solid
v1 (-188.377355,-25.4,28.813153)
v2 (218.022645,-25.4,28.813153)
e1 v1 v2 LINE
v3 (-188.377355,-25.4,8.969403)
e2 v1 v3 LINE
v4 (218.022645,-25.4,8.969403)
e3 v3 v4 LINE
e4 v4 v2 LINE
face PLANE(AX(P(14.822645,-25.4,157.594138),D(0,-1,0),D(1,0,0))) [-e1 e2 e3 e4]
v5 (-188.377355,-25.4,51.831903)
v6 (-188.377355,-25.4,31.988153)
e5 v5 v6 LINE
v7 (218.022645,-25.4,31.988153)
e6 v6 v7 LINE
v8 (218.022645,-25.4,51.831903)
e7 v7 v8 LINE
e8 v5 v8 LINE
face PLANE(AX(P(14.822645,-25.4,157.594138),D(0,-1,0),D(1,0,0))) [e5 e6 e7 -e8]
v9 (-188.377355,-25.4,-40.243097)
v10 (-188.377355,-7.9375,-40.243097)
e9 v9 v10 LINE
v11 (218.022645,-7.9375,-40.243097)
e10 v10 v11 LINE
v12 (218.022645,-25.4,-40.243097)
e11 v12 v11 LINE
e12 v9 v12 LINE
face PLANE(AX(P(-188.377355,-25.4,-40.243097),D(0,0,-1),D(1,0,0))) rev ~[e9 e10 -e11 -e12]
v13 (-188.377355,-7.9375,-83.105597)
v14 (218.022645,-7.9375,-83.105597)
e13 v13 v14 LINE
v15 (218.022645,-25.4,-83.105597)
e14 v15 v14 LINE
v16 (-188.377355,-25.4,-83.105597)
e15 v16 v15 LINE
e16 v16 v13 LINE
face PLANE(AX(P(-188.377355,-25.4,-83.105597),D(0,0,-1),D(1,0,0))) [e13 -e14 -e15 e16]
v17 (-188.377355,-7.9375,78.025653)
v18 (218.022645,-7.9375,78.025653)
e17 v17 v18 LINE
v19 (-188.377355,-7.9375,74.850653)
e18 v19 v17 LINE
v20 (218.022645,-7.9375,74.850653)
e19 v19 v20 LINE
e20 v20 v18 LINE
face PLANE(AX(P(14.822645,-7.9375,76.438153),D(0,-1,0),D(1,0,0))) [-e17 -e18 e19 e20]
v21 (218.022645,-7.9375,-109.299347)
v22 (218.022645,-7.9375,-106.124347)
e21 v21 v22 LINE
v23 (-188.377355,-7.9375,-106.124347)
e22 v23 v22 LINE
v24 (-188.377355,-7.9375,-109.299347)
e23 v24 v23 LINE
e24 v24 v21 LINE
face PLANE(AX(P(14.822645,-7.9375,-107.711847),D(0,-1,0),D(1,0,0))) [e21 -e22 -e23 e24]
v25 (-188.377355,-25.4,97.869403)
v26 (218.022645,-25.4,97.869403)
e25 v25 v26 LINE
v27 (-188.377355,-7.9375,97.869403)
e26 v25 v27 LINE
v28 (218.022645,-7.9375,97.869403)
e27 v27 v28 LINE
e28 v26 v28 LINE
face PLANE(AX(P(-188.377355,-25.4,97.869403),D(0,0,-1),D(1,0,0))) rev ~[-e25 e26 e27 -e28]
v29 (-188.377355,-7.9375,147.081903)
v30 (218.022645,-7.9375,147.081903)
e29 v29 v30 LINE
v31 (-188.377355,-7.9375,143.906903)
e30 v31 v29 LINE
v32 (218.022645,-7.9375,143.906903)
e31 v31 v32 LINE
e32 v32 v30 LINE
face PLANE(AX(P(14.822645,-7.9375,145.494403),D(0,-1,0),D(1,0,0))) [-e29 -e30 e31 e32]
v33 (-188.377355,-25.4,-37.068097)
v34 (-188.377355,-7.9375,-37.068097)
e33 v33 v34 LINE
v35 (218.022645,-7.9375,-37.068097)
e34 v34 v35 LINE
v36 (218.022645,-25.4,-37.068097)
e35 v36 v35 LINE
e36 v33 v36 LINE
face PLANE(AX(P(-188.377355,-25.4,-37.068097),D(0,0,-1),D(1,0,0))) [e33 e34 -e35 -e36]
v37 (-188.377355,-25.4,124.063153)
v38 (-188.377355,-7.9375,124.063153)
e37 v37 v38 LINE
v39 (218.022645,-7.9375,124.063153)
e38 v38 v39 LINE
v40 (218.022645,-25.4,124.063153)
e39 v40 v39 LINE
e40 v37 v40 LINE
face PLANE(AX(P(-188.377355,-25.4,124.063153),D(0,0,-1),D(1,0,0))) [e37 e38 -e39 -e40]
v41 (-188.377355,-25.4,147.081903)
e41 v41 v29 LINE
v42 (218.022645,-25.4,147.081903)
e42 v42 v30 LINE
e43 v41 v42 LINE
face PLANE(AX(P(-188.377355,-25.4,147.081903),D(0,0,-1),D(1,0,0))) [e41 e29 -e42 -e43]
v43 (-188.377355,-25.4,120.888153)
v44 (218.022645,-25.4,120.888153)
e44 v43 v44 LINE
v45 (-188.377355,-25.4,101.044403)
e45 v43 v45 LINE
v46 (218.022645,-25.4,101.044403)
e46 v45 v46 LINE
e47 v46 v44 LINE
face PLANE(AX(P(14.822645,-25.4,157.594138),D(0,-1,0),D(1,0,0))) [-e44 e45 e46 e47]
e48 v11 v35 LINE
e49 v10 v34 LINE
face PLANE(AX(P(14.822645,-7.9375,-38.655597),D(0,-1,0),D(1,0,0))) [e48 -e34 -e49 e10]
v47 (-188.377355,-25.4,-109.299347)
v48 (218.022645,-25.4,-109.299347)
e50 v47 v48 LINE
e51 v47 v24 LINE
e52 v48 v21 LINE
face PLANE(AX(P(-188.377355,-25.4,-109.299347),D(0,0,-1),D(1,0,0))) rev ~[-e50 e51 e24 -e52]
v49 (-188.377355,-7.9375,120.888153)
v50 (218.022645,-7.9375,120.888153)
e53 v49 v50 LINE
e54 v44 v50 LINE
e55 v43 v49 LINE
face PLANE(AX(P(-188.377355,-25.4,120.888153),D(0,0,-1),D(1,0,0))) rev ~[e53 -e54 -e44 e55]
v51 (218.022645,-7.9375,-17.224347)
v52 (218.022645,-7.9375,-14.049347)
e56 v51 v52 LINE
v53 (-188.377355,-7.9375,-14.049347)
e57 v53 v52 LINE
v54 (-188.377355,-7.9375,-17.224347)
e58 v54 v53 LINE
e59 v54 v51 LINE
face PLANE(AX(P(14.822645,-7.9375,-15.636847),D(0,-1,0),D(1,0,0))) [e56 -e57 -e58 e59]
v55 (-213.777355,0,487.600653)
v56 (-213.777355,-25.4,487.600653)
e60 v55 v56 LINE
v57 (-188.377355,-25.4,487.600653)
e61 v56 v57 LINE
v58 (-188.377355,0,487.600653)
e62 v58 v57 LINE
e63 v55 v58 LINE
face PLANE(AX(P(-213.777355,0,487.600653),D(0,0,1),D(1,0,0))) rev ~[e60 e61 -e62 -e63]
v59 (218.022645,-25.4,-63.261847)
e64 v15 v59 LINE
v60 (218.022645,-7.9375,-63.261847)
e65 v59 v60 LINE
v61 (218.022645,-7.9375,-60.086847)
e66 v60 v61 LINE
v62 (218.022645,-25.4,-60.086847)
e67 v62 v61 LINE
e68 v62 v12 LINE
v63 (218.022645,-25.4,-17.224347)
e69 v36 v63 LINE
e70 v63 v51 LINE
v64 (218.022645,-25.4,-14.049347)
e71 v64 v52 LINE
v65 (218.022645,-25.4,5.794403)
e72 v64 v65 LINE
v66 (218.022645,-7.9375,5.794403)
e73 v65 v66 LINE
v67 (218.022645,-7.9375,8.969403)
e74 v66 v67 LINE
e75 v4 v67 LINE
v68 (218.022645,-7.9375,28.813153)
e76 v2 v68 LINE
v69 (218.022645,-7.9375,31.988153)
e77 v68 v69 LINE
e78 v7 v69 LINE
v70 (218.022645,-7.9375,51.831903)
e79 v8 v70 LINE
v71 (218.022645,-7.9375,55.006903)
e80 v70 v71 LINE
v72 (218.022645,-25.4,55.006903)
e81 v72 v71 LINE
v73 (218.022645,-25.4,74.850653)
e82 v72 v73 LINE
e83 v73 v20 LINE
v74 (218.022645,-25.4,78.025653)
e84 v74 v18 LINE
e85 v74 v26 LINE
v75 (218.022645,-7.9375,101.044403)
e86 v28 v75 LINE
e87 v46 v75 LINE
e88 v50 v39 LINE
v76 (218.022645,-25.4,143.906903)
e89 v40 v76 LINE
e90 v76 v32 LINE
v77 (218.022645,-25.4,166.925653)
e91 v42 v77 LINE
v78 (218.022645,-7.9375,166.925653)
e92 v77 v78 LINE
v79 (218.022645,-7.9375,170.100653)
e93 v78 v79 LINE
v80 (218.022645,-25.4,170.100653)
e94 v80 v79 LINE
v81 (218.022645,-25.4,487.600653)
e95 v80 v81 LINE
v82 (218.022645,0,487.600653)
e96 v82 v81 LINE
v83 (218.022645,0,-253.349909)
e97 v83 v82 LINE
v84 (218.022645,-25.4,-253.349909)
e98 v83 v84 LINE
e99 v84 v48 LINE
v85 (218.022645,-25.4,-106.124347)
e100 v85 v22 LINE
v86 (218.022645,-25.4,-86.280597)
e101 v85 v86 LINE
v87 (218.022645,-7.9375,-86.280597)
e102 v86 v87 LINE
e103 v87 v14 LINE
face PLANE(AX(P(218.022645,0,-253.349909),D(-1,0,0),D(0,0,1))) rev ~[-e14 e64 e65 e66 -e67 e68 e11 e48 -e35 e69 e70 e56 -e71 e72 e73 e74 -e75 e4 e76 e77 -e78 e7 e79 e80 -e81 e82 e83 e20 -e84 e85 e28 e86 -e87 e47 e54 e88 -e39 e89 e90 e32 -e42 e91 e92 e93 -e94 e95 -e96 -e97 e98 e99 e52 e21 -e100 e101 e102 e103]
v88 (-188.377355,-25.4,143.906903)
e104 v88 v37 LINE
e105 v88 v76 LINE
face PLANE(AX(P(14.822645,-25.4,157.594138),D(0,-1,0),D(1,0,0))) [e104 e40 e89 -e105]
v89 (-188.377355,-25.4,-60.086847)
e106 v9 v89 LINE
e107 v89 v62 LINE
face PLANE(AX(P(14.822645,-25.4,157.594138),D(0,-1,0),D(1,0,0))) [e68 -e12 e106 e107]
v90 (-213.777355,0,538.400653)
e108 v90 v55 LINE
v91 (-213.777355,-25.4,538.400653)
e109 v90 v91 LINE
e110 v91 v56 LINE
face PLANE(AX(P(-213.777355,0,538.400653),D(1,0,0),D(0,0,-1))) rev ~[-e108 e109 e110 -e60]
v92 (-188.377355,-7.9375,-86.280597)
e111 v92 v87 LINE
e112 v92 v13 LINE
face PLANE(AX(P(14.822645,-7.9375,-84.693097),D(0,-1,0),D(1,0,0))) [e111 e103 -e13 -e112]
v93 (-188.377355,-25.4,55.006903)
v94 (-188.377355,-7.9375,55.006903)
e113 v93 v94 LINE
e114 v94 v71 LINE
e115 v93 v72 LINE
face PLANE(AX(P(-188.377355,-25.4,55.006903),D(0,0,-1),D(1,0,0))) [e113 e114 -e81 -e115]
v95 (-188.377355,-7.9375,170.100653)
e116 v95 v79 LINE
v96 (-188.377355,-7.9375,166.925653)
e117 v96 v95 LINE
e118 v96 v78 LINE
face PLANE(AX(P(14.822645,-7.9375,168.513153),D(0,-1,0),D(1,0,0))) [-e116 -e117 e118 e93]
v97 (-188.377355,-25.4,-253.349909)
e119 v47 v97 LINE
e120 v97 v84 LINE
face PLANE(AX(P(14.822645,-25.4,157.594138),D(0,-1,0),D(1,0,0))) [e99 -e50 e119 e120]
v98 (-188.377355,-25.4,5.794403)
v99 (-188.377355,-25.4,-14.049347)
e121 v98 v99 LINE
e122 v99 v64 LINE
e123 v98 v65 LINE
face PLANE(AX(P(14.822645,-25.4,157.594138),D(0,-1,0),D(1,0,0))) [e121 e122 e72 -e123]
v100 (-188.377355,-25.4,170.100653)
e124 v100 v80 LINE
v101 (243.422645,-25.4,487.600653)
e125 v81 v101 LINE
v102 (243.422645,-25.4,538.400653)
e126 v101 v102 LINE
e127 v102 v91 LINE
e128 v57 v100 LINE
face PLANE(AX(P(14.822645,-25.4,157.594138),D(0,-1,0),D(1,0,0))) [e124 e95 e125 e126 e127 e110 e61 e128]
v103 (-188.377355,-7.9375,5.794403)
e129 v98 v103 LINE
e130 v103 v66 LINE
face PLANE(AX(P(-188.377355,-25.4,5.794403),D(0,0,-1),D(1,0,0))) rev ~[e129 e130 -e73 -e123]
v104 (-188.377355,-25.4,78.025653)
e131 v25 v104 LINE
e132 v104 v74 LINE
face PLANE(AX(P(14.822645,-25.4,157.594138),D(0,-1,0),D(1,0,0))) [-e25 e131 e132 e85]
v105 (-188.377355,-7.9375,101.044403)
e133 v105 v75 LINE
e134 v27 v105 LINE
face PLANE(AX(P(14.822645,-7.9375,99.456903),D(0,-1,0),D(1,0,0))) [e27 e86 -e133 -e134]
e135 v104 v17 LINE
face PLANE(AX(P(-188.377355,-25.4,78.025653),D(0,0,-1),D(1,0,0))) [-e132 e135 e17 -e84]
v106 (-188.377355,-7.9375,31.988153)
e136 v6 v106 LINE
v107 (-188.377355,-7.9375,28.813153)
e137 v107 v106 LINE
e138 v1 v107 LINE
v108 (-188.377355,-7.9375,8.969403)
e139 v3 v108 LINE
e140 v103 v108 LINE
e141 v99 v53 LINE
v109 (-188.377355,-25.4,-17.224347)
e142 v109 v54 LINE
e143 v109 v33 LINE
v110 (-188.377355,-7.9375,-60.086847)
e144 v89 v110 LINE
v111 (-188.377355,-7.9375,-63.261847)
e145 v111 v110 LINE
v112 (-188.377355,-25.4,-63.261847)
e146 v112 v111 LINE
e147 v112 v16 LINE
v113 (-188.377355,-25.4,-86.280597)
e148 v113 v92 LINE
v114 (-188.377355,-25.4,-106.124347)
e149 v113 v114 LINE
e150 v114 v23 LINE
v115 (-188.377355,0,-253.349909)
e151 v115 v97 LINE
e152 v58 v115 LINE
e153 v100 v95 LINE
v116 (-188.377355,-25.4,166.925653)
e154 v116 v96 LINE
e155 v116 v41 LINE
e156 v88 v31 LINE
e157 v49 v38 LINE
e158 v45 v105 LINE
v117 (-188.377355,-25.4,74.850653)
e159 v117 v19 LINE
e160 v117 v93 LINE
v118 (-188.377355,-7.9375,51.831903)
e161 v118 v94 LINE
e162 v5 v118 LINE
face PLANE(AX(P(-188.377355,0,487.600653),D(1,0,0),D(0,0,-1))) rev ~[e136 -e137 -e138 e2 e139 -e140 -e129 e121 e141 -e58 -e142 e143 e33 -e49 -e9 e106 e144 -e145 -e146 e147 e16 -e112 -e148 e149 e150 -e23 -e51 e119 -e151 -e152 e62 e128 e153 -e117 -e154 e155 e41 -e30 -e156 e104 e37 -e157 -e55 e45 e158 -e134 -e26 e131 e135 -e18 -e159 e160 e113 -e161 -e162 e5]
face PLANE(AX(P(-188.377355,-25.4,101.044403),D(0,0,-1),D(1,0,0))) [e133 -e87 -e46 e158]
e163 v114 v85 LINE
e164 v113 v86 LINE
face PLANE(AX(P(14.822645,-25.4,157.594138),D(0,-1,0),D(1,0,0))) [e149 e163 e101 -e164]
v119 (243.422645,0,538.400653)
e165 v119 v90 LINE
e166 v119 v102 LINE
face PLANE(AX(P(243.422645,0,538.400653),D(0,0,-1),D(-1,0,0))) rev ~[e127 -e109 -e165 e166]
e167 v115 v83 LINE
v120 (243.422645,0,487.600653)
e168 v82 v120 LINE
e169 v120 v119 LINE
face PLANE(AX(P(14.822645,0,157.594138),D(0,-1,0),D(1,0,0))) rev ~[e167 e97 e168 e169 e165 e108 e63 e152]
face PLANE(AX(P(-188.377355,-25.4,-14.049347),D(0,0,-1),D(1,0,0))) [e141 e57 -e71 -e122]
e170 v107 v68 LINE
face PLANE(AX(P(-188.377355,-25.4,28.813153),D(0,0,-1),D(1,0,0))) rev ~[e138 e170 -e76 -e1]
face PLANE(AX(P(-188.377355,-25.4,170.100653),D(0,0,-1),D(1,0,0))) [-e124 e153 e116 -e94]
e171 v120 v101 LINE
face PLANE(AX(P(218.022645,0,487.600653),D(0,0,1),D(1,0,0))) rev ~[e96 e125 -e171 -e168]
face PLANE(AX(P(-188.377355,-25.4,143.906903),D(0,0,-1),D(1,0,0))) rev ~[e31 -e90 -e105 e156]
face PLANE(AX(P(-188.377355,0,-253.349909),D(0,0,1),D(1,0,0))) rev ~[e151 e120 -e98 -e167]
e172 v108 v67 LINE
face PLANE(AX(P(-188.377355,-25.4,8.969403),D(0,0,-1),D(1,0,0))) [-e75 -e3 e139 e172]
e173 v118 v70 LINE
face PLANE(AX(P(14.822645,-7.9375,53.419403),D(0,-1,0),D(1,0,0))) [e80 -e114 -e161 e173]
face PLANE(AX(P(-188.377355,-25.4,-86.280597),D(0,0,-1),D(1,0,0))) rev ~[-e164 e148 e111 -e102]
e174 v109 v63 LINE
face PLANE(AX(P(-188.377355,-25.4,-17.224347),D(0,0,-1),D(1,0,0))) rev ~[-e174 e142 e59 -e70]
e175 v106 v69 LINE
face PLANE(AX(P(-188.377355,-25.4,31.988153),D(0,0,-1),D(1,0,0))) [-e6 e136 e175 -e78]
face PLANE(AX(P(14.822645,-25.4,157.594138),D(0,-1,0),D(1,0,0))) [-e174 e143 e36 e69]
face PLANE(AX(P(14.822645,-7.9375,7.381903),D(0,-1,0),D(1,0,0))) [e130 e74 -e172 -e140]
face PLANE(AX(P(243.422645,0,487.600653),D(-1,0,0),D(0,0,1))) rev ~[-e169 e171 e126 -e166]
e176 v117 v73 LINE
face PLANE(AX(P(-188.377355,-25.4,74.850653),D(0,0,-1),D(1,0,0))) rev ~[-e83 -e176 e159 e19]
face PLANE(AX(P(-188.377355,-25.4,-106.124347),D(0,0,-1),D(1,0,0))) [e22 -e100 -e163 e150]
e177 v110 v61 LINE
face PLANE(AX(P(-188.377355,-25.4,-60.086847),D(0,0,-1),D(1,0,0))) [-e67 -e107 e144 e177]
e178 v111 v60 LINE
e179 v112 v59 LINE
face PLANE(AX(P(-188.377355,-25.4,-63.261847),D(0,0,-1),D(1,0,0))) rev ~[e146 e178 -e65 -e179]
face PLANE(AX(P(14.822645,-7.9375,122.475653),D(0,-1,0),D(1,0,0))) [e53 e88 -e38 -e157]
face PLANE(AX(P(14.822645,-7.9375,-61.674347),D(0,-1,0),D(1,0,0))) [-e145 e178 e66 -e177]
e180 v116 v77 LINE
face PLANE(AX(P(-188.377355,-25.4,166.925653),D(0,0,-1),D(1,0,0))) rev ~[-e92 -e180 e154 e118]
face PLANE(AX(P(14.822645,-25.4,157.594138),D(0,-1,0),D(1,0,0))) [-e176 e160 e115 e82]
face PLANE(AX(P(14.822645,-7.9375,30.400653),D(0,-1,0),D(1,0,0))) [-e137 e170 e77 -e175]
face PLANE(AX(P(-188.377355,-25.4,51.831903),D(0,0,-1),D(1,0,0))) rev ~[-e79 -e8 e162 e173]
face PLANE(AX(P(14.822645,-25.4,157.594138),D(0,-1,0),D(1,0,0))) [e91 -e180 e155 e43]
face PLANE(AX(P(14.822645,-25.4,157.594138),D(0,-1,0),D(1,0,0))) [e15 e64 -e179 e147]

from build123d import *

# Parameters (mm, degrees)
F1_DEPTH = 25.4
F2_W     = 406.4
F2_H     = 3.175
F3_DEPTH = 17.4625


# Not quite as in the source:
# - a feature names something its author has since deleted; it is built from what else it names


with BuildPart() as f1:
    # F0 (on Front) → F1 (new body)
    with BuildSketch(Plane.XZ):
        Polygon((218.0226445198, -253.3499094963), (218.0226445198, 487.6006533037), (243.4226445198, 487.6006533037), (243.4226445198, 538.4006533037), (-213.7773554802, 538.4006533037), (-213.7773554802, 487.6006533037), (-188.3773554802, 487.6006533037), (-188.3773554802, -253.3499094963), align=None)
    extrude(amount=F1_DEPTH)

    # F2 (on face) → F3 (cut)
    with BuildSketch(Plane.XZ.offset(25.4)):
        with Locations((14.8226445198, 168.5131533037)):
            Rectangle(F2_W, F2_H)
        with Locations((14.8226445198, 145.4944033037)):
            Rectangle(F2_W, F2_H)
        with Locations((14.8226445198, 122.4756533037)):
            Rectangle(F2_W, F2_H)
        with Locations((14.8226445198, 7.3819033037)):
            Rectangle(F2_W, F2_H)
        with Locations((14.8226445198, 76.4381533037)):
            Rectangle(F2_W, F2_H)
        with Locations((14.8226445198, 53.4194033037)):
            Rectangle(F2_W, F2_H)
        with Locations((14.8226445198, 99.4569033037)):
            Rectangle(F2_W, F2_H)
        with Locations((14.8226445198, 30.4006533037)):
            Rectangle(F2_W, F2_H)
        with Locations((14.8226445198, -15.6368466963)):
            Rectangle(F2_W, F2_H)
        with Locations((14.8226445198, -38.6555966963)):
            Rectangle(F2_W, F2_H)
        with Locations((14.8226445198, -61.6743466963)):
            Rectangle(F2_W, F2_H)
        with Locations((14.8226445198, -84.6930966963)):
            Rectangle(F2_W, F2_H)
        with Locations((14.8226445198, -107.7118466963)):
            Rectangle(F2_W, F2_H)
    extrude(amount=-F3_DEPTH, mode=Mode.SUBTRACT)


solid = f1.part
